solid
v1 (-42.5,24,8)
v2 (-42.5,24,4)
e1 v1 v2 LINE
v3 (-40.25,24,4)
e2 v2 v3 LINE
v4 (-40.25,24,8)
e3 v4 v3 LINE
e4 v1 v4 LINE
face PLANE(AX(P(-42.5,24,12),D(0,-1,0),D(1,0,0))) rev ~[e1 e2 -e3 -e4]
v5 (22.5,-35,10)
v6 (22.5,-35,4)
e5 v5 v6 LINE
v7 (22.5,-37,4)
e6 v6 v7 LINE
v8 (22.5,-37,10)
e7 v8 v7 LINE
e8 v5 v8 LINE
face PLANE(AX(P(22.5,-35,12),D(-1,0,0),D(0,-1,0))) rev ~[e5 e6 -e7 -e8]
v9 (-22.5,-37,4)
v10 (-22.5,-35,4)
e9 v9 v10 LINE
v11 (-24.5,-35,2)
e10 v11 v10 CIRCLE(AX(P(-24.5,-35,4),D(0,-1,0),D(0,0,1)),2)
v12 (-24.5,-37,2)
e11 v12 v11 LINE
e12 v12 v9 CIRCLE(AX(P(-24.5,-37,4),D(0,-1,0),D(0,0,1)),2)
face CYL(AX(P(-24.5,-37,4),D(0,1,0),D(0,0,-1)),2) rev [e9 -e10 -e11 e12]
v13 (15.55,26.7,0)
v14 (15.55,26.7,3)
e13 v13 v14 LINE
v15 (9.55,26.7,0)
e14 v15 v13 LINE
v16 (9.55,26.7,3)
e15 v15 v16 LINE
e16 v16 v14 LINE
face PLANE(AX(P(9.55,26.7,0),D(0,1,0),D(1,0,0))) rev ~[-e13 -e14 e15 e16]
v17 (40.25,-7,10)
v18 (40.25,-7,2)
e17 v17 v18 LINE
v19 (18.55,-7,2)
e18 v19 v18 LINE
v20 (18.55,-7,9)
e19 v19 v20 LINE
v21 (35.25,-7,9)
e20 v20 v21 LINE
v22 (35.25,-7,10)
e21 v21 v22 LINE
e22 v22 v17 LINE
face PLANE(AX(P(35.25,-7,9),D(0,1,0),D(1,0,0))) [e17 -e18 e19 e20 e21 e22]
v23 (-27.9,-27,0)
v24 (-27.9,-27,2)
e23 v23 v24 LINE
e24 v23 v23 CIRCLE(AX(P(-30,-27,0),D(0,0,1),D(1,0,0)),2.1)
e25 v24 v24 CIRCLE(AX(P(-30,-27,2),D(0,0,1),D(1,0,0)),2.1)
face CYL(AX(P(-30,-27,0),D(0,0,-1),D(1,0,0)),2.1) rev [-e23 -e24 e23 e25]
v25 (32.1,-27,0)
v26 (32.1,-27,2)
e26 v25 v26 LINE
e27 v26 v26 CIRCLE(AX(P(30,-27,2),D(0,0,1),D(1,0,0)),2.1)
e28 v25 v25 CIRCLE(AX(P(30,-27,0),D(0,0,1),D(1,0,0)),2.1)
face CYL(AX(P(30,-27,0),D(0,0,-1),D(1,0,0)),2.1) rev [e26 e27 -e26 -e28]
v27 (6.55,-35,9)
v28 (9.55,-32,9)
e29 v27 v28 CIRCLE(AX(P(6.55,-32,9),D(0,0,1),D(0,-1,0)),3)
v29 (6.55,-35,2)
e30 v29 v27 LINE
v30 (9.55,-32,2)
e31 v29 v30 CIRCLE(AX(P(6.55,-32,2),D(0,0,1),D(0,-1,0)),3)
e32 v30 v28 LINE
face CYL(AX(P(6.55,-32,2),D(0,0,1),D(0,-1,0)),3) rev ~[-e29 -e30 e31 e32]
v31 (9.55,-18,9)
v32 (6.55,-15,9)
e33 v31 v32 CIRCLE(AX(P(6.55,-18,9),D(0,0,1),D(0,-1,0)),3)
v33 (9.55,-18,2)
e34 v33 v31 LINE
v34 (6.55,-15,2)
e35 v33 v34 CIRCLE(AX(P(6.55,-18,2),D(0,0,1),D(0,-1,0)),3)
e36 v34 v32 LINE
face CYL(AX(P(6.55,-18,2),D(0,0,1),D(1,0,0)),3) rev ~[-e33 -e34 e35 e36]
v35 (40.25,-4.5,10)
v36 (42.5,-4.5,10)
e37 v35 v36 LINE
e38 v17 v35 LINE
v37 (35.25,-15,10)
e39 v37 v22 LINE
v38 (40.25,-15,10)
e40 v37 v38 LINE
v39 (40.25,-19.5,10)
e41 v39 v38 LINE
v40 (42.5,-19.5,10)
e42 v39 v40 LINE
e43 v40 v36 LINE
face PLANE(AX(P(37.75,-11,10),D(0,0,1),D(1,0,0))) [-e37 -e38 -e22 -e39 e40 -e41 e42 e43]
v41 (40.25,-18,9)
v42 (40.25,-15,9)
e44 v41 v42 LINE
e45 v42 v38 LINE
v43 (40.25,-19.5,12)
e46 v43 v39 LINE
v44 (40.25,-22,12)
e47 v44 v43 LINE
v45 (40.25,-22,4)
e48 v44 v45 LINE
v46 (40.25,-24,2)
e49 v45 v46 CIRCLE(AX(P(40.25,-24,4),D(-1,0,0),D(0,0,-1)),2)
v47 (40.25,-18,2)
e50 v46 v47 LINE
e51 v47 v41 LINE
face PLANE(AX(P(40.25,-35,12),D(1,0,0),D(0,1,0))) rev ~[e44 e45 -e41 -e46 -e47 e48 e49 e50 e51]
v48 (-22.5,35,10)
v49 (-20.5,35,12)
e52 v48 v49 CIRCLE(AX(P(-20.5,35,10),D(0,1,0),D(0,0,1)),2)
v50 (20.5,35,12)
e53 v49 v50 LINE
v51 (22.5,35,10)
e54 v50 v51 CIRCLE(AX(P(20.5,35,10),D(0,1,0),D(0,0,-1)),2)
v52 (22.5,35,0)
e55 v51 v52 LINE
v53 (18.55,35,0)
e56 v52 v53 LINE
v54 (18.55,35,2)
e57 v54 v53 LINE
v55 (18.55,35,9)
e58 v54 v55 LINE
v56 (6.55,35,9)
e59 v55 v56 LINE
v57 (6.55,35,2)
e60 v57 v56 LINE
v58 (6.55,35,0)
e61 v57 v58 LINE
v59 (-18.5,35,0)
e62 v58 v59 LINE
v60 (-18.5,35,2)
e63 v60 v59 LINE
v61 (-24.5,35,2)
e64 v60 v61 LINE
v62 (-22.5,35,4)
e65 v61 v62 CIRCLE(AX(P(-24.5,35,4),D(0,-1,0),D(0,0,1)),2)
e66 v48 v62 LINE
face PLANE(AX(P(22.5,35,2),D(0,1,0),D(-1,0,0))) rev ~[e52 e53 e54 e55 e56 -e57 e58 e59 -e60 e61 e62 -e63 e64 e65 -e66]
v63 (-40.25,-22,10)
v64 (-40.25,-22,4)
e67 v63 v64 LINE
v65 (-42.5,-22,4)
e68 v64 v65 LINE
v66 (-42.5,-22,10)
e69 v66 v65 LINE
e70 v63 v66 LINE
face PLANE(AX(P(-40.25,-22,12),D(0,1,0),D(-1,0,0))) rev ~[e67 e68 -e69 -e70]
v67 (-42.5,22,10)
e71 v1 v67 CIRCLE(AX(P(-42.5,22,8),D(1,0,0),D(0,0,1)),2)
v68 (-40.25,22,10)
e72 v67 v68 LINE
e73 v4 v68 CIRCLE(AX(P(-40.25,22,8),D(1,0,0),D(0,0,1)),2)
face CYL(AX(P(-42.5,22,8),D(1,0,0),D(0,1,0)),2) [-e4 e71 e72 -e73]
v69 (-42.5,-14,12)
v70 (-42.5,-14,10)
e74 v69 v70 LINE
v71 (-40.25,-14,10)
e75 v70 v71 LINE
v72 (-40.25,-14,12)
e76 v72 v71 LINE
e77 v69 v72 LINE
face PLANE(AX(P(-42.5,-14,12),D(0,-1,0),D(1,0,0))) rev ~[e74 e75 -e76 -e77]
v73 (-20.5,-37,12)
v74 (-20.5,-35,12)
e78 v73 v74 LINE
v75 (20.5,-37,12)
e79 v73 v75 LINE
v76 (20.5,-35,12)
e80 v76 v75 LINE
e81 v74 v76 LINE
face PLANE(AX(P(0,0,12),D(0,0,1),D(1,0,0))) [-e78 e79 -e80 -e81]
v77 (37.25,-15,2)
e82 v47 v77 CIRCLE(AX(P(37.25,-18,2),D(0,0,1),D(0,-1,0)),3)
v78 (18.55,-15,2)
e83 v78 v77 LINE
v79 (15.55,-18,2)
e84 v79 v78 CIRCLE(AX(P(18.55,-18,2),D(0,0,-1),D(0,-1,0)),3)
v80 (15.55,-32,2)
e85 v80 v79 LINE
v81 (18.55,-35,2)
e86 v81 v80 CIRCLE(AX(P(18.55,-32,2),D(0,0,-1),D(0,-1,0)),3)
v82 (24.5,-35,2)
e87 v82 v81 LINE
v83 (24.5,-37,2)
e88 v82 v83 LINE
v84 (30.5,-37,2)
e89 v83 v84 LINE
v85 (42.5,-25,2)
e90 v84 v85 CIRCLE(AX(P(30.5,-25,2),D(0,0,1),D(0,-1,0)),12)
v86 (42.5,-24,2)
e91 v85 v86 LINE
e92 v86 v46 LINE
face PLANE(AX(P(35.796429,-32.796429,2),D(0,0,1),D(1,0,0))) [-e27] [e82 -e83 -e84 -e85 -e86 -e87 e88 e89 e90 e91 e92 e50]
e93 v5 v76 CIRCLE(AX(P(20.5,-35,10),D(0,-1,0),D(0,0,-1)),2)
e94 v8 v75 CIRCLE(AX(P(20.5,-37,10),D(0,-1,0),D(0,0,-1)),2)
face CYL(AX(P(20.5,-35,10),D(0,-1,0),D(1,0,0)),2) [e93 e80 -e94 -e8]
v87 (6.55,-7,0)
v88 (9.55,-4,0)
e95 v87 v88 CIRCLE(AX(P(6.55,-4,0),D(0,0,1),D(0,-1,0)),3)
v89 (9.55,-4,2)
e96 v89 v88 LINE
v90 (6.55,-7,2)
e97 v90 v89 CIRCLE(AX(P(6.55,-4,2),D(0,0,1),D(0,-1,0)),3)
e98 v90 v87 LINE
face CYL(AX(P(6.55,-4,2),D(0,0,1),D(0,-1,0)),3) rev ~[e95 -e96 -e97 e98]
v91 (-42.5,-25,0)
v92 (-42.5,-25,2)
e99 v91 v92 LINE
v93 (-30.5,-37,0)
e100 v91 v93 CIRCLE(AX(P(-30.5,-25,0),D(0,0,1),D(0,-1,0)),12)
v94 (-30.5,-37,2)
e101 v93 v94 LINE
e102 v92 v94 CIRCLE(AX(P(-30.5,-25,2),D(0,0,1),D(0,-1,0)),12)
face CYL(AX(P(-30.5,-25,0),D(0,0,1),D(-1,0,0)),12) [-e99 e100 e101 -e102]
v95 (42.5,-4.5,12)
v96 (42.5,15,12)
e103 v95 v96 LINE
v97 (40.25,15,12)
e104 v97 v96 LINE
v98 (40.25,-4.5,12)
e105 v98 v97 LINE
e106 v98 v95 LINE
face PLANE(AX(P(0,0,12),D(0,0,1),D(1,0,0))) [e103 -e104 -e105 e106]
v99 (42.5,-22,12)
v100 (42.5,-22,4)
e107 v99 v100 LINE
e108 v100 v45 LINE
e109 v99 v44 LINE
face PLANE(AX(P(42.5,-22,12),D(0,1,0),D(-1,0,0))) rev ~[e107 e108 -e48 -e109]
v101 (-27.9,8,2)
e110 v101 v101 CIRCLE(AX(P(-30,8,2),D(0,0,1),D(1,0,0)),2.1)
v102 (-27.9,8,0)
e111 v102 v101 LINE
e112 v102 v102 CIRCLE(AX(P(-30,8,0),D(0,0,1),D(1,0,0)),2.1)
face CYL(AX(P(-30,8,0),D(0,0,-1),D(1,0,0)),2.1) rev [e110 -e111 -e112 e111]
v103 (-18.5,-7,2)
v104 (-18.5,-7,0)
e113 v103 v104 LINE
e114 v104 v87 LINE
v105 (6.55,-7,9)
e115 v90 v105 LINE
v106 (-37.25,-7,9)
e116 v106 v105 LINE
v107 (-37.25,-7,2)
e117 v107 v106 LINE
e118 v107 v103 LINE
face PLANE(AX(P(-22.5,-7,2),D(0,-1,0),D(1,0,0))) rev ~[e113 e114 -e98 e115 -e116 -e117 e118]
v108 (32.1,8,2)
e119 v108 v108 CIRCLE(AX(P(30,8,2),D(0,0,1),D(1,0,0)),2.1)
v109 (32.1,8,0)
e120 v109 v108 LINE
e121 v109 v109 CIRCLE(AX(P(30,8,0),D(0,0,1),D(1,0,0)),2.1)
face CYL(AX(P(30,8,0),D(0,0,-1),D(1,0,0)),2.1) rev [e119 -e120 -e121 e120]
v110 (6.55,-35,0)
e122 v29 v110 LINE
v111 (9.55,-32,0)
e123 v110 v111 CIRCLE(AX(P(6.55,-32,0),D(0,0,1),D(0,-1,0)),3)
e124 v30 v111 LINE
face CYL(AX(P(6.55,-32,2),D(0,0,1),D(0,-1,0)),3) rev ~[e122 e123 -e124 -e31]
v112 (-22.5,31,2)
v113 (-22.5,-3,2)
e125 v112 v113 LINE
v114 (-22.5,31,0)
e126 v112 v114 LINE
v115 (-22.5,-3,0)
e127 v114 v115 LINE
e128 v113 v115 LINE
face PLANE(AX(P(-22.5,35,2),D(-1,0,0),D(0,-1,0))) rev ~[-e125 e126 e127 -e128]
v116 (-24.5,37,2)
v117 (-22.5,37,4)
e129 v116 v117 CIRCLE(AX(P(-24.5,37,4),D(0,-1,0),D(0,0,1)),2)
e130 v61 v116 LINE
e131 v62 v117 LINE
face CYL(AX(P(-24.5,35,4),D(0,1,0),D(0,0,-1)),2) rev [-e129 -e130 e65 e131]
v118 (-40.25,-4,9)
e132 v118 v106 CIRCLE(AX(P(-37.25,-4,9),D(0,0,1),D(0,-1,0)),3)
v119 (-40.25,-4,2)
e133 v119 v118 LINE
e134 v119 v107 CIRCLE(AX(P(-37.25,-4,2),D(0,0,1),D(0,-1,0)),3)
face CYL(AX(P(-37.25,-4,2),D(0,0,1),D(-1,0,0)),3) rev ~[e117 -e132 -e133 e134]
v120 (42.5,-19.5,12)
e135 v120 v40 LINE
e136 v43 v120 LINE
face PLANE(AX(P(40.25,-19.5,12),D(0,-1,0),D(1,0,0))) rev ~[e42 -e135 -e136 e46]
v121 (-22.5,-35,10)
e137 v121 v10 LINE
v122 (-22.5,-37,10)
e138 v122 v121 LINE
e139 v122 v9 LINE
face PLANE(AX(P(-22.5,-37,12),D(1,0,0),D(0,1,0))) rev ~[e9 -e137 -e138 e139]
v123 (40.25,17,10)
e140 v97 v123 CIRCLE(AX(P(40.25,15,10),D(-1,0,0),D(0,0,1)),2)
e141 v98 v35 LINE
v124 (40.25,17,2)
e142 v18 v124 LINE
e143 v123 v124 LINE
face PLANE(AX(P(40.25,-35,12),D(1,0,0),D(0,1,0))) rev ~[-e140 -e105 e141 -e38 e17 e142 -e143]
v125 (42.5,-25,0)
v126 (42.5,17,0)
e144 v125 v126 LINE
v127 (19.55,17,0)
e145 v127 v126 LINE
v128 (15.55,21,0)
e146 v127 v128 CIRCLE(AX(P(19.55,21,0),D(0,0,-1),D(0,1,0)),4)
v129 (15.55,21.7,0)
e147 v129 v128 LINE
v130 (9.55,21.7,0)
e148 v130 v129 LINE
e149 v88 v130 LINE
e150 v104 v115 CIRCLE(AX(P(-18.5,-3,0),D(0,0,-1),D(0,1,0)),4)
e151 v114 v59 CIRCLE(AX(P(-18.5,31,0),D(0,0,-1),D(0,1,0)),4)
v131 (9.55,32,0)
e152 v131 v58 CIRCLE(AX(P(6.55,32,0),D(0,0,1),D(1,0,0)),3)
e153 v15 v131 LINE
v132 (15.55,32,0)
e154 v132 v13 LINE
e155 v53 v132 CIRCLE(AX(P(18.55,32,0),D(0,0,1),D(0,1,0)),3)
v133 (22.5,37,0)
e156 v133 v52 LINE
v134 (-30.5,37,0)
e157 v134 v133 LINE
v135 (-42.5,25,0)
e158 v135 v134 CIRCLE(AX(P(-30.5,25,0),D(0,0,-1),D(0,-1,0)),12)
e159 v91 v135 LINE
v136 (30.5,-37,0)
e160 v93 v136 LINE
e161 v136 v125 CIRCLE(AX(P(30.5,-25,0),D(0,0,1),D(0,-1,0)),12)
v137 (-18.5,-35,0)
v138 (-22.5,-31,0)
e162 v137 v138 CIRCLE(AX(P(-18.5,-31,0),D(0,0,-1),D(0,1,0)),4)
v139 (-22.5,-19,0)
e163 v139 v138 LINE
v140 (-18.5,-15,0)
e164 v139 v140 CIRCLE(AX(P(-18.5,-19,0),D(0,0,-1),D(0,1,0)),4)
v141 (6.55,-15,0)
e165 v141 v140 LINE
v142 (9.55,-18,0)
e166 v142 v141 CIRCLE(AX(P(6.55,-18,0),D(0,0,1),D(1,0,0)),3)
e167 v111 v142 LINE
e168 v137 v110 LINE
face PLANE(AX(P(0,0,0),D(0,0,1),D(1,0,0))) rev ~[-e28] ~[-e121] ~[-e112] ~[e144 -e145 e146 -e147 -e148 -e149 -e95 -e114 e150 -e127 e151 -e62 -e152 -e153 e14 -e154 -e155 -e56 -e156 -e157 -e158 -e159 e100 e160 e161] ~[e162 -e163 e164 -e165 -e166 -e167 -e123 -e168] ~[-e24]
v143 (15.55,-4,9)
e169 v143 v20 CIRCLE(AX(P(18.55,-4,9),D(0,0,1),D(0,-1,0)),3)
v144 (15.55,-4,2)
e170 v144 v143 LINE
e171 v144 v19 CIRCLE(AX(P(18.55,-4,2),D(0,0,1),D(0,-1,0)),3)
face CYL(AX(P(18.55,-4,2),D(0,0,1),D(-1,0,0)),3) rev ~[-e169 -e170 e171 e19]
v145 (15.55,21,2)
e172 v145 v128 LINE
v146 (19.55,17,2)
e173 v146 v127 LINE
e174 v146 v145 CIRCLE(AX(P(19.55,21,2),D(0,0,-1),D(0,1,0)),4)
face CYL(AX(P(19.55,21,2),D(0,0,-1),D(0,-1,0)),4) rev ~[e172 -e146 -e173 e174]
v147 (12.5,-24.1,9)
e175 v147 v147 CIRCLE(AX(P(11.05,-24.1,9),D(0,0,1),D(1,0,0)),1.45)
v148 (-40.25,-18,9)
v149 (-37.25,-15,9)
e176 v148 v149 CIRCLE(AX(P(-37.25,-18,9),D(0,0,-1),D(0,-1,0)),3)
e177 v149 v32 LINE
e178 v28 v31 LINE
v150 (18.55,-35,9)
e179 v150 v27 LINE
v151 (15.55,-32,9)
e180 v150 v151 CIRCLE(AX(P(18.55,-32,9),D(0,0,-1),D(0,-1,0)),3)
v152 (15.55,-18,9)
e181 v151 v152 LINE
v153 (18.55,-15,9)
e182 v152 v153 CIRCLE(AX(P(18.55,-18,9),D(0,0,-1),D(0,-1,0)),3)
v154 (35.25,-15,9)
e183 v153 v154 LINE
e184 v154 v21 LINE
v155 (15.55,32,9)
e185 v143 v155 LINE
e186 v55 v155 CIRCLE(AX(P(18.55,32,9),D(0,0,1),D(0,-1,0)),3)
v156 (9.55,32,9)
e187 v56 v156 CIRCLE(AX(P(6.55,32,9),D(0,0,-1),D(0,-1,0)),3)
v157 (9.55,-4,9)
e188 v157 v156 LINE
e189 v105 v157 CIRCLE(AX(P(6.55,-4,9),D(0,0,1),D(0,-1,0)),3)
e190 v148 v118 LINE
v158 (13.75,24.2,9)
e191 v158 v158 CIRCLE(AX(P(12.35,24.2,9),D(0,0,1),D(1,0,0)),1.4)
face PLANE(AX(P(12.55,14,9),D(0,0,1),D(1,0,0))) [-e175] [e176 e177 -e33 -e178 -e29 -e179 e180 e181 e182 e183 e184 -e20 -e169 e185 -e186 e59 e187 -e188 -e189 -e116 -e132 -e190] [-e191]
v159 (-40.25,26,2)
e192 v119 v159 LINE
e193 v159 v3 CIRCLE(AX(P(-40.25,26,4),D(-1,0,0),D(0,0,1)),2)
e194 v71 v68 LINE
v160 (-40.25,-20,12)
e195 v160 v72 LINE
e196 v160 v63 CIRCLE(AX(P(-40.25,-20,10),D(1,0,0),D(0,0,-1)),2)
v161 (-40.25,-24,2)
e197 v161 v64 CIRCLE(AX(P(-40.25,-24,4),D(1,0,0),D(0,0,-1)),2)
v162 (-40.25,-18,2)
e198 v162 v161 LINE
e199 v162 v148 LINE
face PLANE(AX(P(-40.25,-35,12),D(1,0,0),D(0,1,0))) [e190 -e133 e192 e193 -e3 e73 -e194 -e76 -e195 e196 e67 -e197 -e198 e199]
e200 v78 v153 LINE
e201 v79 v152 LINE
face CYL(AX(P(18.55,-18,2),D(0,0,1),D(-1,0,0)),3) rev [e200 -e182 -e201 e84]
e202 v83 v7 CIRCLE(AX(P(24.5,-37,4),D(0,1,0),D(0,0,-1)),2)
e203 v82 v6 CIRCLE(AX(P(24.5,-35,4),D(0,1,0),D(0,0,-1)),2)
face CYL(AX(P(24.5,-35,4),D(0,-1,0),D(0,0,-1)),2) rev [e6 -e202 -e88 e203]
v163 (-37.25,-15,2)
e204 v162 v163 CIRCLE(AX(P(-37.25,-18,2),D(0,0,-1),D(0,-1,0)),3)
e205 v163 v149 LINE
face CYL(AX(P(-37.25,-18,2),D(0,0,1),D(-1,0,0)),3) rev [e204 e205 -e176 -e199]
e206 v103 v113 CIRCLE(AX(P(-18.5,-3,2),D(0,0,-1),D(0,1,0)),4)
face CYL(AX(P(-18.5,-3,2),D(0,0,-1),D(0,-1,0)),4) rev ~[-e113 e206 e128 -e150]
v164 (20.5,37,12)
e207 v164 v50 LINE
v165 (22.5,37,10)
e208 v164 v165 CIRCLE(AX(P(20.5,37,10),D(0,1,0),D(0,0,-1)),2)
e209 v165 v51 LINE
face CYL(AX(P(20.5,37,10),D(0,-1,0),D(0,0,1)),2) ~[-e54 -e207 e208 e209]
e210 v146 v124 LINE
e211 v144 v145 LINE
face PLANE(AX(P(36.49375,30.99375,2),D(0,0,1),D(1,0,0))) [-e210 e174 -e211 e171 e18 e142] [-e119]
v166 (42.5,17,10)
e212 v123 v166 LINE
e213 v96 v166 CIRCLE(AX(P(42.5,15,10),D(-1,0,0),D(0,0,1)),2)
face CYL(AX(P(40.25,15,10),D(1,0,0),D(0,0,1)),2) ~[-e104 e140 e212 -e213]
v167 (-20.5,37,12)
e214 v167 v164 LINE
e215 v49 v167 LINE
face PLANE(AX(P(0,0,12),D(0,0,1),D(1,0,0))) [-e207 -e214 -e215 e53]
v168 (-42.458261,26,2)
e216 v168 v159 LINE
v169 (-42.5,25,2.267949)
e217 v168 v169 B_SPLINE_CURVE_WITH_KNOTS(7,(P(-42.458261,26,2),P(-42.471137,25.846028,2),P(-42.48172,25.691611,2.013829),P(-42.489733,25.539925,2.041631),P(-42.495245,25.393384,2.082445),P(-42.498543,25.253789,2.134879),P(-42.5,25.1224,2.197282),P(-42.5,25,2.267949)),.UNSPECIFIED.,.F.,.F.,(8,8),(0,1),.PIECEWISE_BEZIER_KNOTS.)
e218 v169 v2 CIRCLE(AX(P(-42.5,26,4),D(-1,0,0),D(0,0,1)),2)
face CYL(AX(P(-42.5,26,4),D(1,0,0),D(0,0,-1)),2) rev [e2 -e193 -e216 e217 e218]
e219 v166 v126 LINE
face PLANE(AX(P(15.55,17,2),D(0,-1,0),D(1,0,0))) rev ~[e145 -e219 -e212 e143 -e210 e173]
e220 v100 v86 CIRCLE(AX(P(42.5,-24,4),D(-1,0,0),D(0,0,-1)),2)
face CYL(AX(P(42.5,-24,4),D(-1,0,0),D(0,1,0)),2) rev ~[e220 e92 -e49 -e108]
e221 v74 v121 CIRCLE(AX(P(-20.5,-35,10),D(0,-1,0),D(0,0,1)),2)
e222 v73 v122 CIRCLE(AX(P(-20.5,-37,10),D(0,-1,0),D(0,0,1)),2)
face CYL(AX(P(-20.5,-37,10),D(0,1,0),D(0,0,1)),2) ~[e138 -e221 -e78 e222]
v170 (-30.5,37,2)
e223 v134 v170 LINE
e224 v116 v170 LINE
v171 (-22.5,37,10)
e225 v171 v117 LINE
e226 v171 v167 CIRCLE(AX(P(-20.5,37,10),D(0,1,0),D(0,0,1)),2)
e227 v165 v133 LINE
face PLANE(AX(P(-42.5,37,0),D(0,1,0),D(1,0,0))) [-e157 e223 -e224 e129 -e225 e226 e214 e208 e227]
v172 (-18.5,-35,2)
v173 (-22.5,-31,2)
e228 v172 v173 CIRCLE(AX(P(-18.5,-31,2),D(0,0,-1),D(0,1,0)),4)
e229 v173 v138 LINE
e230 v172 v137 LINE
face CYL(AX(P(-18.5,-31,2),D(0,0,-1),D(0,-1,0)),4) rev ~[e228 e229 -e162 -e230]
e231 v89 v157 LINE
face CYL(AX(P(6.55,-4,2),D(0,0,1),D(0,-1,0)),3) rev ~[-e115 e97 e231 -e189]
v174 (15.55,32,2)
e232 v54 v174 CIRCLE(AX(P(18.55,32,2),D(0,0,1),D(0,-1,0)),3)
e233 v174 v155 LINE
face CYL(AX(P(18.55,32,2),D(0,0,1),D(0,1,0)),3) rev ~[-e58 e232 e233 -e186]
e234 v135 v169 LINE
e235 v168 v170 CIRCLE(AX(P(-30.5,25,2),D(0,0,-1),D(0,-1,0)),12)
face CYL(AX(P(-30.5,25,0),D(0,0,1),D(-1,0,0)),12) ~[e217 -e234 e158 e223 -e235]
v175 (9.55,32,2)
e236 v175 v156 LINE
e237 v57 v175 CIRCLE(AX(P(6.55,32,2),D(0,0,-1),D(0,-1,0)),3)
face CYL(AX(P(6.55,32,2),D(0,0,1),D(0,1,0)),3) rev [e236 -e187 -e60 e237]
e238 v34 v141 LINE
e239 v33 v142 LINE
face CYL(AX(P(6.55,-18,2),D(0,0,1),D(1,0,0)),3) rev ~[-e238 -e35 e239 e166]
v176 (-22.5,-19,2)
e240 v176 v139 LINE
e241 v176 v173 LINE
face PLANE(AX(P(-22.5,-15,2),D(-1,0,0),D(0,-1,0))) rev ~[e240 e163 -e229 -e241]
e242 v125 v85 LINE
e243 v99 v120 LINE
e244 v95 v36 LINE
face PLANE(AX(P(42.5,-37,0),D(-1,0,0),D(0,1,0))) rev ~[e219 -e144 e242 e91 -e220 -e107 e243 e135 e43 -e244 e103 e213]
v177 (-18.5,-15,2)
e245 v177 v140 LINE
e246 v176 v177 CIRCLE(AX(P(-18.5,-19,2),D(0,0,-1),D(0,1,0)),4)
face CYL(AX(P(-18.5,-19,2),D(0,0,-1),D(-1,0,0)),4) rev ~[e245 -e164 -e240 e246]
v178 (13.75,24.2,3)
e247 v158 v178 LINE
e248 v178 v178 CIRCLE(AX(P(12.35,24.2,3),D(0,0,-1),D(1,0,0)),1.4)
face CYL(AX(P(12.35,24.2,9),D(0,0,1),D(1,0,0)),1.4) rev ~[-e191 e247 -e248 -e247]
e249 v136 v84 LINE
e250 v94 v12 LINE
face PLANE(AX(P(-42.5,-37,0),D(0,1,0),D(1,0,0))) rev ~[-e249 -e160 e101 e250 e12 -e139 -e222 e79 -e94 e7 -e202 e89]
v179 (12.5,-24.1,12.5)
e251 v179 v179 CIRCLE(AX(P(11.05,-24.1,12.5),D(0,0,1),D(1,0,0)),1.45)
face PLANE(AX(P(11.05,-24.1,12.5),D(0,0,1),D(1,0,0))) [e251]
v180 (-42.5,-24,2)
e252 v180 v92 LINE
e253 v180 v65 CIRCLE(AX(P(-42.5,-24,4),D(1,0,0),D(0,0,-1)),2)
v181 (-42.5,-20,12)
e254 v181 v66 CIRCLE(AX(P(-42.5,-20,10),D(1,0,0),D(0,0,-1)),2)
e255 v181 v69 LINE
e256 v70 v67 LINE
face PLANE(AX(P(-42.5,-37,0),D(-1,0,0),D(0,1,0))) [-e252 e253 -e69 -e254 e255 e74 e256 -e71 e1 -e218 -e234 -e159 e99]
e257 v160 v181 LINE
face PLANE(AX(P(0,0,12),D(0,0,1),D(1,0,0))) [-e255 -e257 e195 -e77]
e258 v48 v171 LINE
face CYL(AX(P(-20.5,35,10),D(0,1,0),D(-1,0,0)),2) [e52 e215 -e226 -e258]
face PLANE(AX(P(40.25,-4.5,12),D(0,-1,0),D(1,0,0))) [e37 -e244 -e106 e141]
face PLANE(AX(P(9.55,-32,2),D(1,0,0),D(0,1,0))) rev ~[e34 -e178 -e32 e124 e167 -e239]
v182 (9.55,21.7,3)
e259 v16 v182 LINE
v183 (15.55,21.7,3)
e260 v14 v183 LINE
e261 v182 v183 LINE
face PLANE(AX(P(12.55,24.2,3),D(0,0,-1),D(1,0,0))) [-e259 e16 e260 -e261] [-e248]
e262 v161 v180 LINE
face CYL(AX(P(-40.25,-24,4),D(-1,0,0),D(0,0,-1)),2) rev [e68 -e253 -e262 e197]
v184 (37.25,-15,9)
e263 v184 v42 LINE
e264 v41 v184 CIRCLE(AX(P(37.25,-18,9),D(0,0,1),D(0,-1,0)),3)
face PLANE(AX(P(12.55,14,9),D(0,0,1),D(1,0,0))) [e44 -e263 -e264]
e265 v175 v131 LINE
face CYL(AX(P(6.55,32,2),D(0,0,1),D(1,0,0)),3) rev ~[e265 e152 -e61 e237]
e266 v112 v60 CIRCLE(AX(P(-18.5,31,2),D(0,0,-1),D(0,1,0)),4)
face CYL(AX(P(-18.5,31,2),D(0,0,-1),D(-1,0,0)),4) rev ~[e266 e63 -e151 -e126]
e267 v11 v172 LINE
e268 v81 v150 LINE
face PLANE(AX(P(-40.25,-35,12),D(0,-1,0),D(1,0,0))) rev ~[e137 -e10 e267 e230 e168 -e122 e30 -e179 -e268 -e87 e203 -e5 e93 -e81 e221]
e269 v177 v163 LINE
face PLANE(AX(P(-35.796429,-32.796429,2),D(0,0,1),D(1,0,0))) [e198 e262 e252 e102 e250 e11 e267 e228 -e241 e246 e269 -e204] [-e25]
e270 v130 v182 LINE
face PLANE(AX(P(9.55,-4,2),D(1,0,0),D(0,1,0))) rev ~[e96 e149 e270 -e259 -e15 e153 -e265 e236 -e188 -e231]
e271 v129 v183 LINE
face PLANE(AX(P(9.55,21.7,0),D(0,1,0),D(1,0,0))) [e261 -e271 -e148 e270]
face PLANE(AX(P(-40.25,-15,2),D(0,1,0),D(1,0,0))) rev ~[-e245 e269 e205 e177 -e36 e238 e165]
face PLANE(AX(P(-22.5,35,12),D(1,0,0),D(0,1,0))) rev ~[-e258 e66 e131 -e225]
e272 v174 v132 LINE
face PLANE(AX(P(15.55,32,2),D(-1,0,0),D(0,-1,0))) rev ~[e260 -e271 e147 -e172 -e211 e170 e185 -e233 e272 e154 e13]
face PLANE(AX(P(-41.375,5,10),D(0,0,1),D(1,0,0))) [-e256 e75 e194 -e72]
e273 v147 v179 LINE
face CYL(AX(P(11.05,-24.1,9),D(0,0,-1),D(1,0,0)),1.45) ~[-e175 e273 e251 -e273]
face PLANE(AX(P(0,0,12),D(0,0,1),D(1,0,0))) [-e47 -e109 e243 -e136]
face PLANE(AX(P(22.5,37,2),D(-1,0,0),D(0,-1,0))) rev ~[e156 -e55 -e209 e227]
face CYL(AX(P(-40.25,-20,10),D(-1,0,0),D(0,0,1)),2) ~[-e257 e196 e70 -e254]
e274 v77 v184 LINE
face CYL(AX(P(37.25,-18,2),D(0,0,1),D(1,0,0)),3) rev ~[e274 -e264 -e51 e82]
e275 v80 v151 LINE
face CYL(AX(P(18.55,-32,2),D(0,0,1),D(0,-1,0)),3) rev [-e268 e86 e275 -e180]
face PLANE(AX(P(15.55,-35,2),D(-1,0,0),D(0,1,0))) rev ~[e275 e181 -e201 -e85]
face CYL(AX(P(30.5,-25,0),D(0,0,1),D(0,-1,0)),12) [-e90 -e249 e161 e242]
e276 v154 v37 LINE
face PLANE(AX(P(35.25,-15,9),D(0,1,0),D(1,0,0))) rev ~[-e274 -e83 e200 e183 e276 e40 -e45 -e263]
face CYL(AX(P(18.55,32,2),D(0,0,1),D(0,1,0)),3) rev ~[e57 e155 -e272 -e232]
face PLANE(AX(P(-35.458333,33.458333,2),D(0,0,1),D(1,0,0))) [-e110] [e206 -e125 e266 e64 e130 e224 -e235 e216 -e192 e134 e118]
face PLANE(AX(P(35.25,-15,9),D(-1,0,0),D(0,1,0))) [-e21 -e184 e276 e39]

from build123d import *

# Parameters (mm, degrees)
F0_W      = 85
F0_H      = 74
F0_R      = 2.1
F1_DEPTH  = 12
F2_W      = 80.5
F2_H      = 70
F2_R      = 2.1
F3_DEPTH  = 10
F4_W      = 6
F4_H      = 42
F4_W_2    = 49.8
F4_H_2    = 8
F4_W_3    = 24.7
F4_H_3    = 20
F5_DEPTH  = 7
F6_R      = 1.45
F7_DEPTH  = 3.5
F8_W      = 2.25
F8_H      = 38
F9_DEPTH  = 2
F11_DEPTH = 10
F12_W     = 2.25
F12_H     = 15
F13_DEPTH = 2
F14_R     = 12
F15_R     = 3
F17_DEPTH = 2
F19_DEPTH = 2
F21_DEPTH = 2
F22_R     = 4
F23_R     = 2
F6_R_2    = 1.4
F24_DEPTH = 9
F25_W     = 6
F25_H     = 5
F25_R     = 1.4
F26_DEPTH = 3
F27_W     = 5
F27_H     = 8
F28_DEPTH = 1


with BuildPart() as f1:
    # F0 (on Top) → F1 (new body)
    with BuildSketch(Plane.XY):
        Rectangle(F0_W, F0_H)
        with Locations((-30, -27)):
            Circle(F0_R, mode=Mode.SUBTRACT)
        with Locations((30, -27)):
            Circle(F0_R, mode=Mode.SUBTRACT)
        with Locations((-30, 8)):
            Circle(F0_R, mode=Mode.SUBTRACT)
        with Locations((30, 8)):
            Circle(F0_R, mode=Mode.SUBTRACT)
    extrude(amount=F1_DEPTH)

    # F2 (on face) → F3 (cut)
    with BuildSketch(Plane.XY.offset(12)):
        Rectangle(F2_W, F2_H)
        with Locations((-30, -27)):
            Circle(F2_R, mode=Mode.SUBTRACT)
        with Locations((30, -27)):
            Circle(F2_R, mode=Mode.SUBTRACT)
        with Locations((-30, 8)):
            Circle(F2_R, mode=Mode.SUBTRACT)
        with Locations((30, 8)):
            Circle(F2_R, mode=Mode.SUBTRACT)
    extrude(amount=-F3_DEPTH, mode=Mode.SUBTRACT)

    # F4 (on face) → F5 (join)
    with BuildSketch(Plane.XY.offset(2)):
        with Locations((12.55, 14)):
            Rectangle(F4_W, F4_H)
        with Locations((-15.35, -11)):
            Rectangle(F4_W_2, F4_H_2)
        with Locations((12.55, -11)):
            Rectangle(F4_W, F4_H_2)
        with Locations((27.9, -11)):
            Rectangle(F4_W_3, F4_H_2)
        with Locations((12.55, -25)):
            Rectangle(F4_W, F4_H_3)
    extrude(amount=F5_DEPTH)

    # F6 (on face) → F7 (join)
    with BuildSketch(Plane.XY.offset(9)):
        with Locations((11.05, -24.1)):
            Circle(F6_R)
    extrude(amount=F7_DEPTH)

    # F8 (on face) → F9 (cut)
    with BuildSketch(Plane.XY.offset(12)):
        with Locations((-41.375, 5)):
            Rectangle(F8_W, F8_H)
    extrude(amount=-F9_DEPTH, mode=Mode.SUBTRACT)

    # F10 (on face) → F11 (cut, through all)
    with BuildSketch(Plane.XY.offset(12)):
        Polygon((-42.5, 37), (-42.5, 24), (-40.25, 24), (-40.25, 35), (-22.5, 35), (-22.5, 37), align=None)
        Polygon((42.5, 37), (22.5, 37), (22.5, 35), (40.25, 35), (40.25, 17), (42.5, 17), align=None)
        Polygon((42.5, -37), (42.5, -22), (40.25, -22), (40.25, -35), (22.5, -35), (22.5, -37), align=None)
        Polygon((-42.5, -37), (-22.5, -37), (-22.5, -35), (-40.25, -35), (-40.25, -22), (-42.5, -22), align=None)
    extrude(amount=-F11_DEPTH, mode=Mode.SUBTRACT)

    # F12 (on face) → F13 (cut)
    with BuildSketch(Plane.XY.offset(12)):
        with Locations((41.375, -12)):
            Rectangle(F12_W, F12_H)
    extrude(amount=-F13_DEPTH, mode=Mode.SUBTRACT)

    # F14
    f14_edges = [f1.edges().sort_by_distance(p)[0] for p in [
        (-42.5, 37, 1),
        (-42.5, -37, 1),
        (42.5, -37, 1),
        (42.5, 37, 1),
    ]]
    fillet(f14_edges, radius=F14_R)

    # F15
    f15_edges = [f1.edges().sort_by_distance(p)[0] for p in [
        (9.55, -7, 5.5),
        (9.55, -15, 5.5),
        (15.55, -15, 5.5),
        (15.55, -7, 5.5),
        (-40.25, -7, 5.5),
        (-40.25, -15, 5.5),
        (9.55, 35, 5.5),
        (15.55, 35, 5.5),
        (9.55, -35, 5.5),
        (40.25, -15, 5.5),
        (15.55, -35, 5.5),
    ]]
    fillet(f15_edges, radius=F15_R)

    # F16 (on face) → F17 (cut, through all)
    with BuildSketch(Plane.XY.offset(2)):
        with BuildLine():
            ThreePointArc((9.55, -18), (8.6713203436, -15.8786796564), (6.55, -15))
            Line((6.55, -15), (-22.5, -15))
            Line((-22.5, -15), (-22.5, -35))
            Line((-22.5, -35), (6.55, -35))
            ThreePointArc((6.55, -35), (8.6713203436, -34.1213203436), (9.55, -32))
            Line((9.55, -32), (9.55, -18))
        make_face()
    extrude(amount=-F17_DEPTH, mode=Mode.SUBTRACT)

    # F18 (on face) → F19 (cut, through all)
    with BuildSketch(Plane.XY.offset(2)):
        with BuildLine():
            Line((-22.5, 35), (-22.5, -7))
            Line((-22.5, -7), (6.55, -7))
            ThreePointArc((6.55, -7), (8.6713203436, -6.1213203436), (9.55, -4))
            Line((9.55, -4), (9.55, 32))
            ThreePointArc((9.55, 32), (8.6713203436, 34.1213203436), (6.55, 35))
            Line((6.55, 35), (-22.5, 35))
        make_face()
    extrude(amount=-F19_DEPTH, mode=Mode.SUBTRACT)

    # F20 (on face) → F21 (cut, through all)
    with BuildSketch(Plane.XY.offset(2)):
        with BuildLine():
            ThreePointArc((18.55, 35), (16.4286796564, 34.1213203436), (15.55, 32))
            Line((15.55, 32), (15.55, 17))
            Line((15.55, 17), (40.25, 17))
            Line((40.25, 17), (42.5, 17))
            Line((42.5, 17), (42.5, 25))
            ThreePointArc((42.5, 25), (38.9852813742, 33.4852813742), (30.5, 37))
            Line((30.5, 37), (22.5, 37))
            Line((22.5, 37), (22.5, 35))
            Line((22.5, 35), (18.55, 35))
        make_face()
    extrude(amount=-F21_DEPTH, mode=Mode.SUBTRACT)

    # F22
    f22_edges = [f1.edges().sort_by_distance(p)[0] for p in [
        (-22.5, 35, 1),
        (-22.5, -7, 1),
        (15.55, 17, 1),
        (-22.5, -15, 1),
        (-22.5, -35, 1),
    ]]
    fillet(f22_edges, radius=F22_R)

    # F23
    f23_edges = [f1.edges().sort_by_distance(p)[0] for p in [
        (-22.5, -36, 12),
        (22.5, -36, 12),
        (-41.375, -22, 12),
        (-22.5, 36, 12),
        (-22.5, 36, 2),
        (22.5, 36, 12),
        (41.375, 17, 12),
        (-41.375, 24, 10),
        (-22.5, -36, 2),
        (22.5, -36, 2),
        (41.375, -22, 2),
        (-41.375, -22, 2),
        (-41.375, 24, 2),
    ]]
    fillet(f23_edges, radius=F23_R)

    # F6 (on face) → F24 (cut, through all)
    with BuildSketch(Plane.XY.offset(9)):
        with Locations((12.35, 24.2)):
            Circle(F6_R_2)
    extrude(amount=-F24_DEPTH, mode=Mode.SUBTRACT)

    # F25 (on face) → F26 (cut)
    with BuildSketch(Plane(origin=(0, 0, 0), x_dir=(1, 0, 0), z_dir=(0, 0, -1))):
        with Locations((12.55, -24.2)):
            Rectangle(F25_W, F25_H)
        with Locations((12.35, -24.2)):
            Circle(F25_R, mode=Mode.SUBTRACT)
    extrude(amount=-F26_DEPTH, mode=Mode.SUBTRACT)

    # F27 (on face) → F28 (join, through all)
    with BuildSketch(Plane.XY.offset(9)):
        with Locations((37.75, -11)):
            Rectangle(F27_W, F27_H)
    extrude(amount=F28_DEPTH)


solid = f1.part
